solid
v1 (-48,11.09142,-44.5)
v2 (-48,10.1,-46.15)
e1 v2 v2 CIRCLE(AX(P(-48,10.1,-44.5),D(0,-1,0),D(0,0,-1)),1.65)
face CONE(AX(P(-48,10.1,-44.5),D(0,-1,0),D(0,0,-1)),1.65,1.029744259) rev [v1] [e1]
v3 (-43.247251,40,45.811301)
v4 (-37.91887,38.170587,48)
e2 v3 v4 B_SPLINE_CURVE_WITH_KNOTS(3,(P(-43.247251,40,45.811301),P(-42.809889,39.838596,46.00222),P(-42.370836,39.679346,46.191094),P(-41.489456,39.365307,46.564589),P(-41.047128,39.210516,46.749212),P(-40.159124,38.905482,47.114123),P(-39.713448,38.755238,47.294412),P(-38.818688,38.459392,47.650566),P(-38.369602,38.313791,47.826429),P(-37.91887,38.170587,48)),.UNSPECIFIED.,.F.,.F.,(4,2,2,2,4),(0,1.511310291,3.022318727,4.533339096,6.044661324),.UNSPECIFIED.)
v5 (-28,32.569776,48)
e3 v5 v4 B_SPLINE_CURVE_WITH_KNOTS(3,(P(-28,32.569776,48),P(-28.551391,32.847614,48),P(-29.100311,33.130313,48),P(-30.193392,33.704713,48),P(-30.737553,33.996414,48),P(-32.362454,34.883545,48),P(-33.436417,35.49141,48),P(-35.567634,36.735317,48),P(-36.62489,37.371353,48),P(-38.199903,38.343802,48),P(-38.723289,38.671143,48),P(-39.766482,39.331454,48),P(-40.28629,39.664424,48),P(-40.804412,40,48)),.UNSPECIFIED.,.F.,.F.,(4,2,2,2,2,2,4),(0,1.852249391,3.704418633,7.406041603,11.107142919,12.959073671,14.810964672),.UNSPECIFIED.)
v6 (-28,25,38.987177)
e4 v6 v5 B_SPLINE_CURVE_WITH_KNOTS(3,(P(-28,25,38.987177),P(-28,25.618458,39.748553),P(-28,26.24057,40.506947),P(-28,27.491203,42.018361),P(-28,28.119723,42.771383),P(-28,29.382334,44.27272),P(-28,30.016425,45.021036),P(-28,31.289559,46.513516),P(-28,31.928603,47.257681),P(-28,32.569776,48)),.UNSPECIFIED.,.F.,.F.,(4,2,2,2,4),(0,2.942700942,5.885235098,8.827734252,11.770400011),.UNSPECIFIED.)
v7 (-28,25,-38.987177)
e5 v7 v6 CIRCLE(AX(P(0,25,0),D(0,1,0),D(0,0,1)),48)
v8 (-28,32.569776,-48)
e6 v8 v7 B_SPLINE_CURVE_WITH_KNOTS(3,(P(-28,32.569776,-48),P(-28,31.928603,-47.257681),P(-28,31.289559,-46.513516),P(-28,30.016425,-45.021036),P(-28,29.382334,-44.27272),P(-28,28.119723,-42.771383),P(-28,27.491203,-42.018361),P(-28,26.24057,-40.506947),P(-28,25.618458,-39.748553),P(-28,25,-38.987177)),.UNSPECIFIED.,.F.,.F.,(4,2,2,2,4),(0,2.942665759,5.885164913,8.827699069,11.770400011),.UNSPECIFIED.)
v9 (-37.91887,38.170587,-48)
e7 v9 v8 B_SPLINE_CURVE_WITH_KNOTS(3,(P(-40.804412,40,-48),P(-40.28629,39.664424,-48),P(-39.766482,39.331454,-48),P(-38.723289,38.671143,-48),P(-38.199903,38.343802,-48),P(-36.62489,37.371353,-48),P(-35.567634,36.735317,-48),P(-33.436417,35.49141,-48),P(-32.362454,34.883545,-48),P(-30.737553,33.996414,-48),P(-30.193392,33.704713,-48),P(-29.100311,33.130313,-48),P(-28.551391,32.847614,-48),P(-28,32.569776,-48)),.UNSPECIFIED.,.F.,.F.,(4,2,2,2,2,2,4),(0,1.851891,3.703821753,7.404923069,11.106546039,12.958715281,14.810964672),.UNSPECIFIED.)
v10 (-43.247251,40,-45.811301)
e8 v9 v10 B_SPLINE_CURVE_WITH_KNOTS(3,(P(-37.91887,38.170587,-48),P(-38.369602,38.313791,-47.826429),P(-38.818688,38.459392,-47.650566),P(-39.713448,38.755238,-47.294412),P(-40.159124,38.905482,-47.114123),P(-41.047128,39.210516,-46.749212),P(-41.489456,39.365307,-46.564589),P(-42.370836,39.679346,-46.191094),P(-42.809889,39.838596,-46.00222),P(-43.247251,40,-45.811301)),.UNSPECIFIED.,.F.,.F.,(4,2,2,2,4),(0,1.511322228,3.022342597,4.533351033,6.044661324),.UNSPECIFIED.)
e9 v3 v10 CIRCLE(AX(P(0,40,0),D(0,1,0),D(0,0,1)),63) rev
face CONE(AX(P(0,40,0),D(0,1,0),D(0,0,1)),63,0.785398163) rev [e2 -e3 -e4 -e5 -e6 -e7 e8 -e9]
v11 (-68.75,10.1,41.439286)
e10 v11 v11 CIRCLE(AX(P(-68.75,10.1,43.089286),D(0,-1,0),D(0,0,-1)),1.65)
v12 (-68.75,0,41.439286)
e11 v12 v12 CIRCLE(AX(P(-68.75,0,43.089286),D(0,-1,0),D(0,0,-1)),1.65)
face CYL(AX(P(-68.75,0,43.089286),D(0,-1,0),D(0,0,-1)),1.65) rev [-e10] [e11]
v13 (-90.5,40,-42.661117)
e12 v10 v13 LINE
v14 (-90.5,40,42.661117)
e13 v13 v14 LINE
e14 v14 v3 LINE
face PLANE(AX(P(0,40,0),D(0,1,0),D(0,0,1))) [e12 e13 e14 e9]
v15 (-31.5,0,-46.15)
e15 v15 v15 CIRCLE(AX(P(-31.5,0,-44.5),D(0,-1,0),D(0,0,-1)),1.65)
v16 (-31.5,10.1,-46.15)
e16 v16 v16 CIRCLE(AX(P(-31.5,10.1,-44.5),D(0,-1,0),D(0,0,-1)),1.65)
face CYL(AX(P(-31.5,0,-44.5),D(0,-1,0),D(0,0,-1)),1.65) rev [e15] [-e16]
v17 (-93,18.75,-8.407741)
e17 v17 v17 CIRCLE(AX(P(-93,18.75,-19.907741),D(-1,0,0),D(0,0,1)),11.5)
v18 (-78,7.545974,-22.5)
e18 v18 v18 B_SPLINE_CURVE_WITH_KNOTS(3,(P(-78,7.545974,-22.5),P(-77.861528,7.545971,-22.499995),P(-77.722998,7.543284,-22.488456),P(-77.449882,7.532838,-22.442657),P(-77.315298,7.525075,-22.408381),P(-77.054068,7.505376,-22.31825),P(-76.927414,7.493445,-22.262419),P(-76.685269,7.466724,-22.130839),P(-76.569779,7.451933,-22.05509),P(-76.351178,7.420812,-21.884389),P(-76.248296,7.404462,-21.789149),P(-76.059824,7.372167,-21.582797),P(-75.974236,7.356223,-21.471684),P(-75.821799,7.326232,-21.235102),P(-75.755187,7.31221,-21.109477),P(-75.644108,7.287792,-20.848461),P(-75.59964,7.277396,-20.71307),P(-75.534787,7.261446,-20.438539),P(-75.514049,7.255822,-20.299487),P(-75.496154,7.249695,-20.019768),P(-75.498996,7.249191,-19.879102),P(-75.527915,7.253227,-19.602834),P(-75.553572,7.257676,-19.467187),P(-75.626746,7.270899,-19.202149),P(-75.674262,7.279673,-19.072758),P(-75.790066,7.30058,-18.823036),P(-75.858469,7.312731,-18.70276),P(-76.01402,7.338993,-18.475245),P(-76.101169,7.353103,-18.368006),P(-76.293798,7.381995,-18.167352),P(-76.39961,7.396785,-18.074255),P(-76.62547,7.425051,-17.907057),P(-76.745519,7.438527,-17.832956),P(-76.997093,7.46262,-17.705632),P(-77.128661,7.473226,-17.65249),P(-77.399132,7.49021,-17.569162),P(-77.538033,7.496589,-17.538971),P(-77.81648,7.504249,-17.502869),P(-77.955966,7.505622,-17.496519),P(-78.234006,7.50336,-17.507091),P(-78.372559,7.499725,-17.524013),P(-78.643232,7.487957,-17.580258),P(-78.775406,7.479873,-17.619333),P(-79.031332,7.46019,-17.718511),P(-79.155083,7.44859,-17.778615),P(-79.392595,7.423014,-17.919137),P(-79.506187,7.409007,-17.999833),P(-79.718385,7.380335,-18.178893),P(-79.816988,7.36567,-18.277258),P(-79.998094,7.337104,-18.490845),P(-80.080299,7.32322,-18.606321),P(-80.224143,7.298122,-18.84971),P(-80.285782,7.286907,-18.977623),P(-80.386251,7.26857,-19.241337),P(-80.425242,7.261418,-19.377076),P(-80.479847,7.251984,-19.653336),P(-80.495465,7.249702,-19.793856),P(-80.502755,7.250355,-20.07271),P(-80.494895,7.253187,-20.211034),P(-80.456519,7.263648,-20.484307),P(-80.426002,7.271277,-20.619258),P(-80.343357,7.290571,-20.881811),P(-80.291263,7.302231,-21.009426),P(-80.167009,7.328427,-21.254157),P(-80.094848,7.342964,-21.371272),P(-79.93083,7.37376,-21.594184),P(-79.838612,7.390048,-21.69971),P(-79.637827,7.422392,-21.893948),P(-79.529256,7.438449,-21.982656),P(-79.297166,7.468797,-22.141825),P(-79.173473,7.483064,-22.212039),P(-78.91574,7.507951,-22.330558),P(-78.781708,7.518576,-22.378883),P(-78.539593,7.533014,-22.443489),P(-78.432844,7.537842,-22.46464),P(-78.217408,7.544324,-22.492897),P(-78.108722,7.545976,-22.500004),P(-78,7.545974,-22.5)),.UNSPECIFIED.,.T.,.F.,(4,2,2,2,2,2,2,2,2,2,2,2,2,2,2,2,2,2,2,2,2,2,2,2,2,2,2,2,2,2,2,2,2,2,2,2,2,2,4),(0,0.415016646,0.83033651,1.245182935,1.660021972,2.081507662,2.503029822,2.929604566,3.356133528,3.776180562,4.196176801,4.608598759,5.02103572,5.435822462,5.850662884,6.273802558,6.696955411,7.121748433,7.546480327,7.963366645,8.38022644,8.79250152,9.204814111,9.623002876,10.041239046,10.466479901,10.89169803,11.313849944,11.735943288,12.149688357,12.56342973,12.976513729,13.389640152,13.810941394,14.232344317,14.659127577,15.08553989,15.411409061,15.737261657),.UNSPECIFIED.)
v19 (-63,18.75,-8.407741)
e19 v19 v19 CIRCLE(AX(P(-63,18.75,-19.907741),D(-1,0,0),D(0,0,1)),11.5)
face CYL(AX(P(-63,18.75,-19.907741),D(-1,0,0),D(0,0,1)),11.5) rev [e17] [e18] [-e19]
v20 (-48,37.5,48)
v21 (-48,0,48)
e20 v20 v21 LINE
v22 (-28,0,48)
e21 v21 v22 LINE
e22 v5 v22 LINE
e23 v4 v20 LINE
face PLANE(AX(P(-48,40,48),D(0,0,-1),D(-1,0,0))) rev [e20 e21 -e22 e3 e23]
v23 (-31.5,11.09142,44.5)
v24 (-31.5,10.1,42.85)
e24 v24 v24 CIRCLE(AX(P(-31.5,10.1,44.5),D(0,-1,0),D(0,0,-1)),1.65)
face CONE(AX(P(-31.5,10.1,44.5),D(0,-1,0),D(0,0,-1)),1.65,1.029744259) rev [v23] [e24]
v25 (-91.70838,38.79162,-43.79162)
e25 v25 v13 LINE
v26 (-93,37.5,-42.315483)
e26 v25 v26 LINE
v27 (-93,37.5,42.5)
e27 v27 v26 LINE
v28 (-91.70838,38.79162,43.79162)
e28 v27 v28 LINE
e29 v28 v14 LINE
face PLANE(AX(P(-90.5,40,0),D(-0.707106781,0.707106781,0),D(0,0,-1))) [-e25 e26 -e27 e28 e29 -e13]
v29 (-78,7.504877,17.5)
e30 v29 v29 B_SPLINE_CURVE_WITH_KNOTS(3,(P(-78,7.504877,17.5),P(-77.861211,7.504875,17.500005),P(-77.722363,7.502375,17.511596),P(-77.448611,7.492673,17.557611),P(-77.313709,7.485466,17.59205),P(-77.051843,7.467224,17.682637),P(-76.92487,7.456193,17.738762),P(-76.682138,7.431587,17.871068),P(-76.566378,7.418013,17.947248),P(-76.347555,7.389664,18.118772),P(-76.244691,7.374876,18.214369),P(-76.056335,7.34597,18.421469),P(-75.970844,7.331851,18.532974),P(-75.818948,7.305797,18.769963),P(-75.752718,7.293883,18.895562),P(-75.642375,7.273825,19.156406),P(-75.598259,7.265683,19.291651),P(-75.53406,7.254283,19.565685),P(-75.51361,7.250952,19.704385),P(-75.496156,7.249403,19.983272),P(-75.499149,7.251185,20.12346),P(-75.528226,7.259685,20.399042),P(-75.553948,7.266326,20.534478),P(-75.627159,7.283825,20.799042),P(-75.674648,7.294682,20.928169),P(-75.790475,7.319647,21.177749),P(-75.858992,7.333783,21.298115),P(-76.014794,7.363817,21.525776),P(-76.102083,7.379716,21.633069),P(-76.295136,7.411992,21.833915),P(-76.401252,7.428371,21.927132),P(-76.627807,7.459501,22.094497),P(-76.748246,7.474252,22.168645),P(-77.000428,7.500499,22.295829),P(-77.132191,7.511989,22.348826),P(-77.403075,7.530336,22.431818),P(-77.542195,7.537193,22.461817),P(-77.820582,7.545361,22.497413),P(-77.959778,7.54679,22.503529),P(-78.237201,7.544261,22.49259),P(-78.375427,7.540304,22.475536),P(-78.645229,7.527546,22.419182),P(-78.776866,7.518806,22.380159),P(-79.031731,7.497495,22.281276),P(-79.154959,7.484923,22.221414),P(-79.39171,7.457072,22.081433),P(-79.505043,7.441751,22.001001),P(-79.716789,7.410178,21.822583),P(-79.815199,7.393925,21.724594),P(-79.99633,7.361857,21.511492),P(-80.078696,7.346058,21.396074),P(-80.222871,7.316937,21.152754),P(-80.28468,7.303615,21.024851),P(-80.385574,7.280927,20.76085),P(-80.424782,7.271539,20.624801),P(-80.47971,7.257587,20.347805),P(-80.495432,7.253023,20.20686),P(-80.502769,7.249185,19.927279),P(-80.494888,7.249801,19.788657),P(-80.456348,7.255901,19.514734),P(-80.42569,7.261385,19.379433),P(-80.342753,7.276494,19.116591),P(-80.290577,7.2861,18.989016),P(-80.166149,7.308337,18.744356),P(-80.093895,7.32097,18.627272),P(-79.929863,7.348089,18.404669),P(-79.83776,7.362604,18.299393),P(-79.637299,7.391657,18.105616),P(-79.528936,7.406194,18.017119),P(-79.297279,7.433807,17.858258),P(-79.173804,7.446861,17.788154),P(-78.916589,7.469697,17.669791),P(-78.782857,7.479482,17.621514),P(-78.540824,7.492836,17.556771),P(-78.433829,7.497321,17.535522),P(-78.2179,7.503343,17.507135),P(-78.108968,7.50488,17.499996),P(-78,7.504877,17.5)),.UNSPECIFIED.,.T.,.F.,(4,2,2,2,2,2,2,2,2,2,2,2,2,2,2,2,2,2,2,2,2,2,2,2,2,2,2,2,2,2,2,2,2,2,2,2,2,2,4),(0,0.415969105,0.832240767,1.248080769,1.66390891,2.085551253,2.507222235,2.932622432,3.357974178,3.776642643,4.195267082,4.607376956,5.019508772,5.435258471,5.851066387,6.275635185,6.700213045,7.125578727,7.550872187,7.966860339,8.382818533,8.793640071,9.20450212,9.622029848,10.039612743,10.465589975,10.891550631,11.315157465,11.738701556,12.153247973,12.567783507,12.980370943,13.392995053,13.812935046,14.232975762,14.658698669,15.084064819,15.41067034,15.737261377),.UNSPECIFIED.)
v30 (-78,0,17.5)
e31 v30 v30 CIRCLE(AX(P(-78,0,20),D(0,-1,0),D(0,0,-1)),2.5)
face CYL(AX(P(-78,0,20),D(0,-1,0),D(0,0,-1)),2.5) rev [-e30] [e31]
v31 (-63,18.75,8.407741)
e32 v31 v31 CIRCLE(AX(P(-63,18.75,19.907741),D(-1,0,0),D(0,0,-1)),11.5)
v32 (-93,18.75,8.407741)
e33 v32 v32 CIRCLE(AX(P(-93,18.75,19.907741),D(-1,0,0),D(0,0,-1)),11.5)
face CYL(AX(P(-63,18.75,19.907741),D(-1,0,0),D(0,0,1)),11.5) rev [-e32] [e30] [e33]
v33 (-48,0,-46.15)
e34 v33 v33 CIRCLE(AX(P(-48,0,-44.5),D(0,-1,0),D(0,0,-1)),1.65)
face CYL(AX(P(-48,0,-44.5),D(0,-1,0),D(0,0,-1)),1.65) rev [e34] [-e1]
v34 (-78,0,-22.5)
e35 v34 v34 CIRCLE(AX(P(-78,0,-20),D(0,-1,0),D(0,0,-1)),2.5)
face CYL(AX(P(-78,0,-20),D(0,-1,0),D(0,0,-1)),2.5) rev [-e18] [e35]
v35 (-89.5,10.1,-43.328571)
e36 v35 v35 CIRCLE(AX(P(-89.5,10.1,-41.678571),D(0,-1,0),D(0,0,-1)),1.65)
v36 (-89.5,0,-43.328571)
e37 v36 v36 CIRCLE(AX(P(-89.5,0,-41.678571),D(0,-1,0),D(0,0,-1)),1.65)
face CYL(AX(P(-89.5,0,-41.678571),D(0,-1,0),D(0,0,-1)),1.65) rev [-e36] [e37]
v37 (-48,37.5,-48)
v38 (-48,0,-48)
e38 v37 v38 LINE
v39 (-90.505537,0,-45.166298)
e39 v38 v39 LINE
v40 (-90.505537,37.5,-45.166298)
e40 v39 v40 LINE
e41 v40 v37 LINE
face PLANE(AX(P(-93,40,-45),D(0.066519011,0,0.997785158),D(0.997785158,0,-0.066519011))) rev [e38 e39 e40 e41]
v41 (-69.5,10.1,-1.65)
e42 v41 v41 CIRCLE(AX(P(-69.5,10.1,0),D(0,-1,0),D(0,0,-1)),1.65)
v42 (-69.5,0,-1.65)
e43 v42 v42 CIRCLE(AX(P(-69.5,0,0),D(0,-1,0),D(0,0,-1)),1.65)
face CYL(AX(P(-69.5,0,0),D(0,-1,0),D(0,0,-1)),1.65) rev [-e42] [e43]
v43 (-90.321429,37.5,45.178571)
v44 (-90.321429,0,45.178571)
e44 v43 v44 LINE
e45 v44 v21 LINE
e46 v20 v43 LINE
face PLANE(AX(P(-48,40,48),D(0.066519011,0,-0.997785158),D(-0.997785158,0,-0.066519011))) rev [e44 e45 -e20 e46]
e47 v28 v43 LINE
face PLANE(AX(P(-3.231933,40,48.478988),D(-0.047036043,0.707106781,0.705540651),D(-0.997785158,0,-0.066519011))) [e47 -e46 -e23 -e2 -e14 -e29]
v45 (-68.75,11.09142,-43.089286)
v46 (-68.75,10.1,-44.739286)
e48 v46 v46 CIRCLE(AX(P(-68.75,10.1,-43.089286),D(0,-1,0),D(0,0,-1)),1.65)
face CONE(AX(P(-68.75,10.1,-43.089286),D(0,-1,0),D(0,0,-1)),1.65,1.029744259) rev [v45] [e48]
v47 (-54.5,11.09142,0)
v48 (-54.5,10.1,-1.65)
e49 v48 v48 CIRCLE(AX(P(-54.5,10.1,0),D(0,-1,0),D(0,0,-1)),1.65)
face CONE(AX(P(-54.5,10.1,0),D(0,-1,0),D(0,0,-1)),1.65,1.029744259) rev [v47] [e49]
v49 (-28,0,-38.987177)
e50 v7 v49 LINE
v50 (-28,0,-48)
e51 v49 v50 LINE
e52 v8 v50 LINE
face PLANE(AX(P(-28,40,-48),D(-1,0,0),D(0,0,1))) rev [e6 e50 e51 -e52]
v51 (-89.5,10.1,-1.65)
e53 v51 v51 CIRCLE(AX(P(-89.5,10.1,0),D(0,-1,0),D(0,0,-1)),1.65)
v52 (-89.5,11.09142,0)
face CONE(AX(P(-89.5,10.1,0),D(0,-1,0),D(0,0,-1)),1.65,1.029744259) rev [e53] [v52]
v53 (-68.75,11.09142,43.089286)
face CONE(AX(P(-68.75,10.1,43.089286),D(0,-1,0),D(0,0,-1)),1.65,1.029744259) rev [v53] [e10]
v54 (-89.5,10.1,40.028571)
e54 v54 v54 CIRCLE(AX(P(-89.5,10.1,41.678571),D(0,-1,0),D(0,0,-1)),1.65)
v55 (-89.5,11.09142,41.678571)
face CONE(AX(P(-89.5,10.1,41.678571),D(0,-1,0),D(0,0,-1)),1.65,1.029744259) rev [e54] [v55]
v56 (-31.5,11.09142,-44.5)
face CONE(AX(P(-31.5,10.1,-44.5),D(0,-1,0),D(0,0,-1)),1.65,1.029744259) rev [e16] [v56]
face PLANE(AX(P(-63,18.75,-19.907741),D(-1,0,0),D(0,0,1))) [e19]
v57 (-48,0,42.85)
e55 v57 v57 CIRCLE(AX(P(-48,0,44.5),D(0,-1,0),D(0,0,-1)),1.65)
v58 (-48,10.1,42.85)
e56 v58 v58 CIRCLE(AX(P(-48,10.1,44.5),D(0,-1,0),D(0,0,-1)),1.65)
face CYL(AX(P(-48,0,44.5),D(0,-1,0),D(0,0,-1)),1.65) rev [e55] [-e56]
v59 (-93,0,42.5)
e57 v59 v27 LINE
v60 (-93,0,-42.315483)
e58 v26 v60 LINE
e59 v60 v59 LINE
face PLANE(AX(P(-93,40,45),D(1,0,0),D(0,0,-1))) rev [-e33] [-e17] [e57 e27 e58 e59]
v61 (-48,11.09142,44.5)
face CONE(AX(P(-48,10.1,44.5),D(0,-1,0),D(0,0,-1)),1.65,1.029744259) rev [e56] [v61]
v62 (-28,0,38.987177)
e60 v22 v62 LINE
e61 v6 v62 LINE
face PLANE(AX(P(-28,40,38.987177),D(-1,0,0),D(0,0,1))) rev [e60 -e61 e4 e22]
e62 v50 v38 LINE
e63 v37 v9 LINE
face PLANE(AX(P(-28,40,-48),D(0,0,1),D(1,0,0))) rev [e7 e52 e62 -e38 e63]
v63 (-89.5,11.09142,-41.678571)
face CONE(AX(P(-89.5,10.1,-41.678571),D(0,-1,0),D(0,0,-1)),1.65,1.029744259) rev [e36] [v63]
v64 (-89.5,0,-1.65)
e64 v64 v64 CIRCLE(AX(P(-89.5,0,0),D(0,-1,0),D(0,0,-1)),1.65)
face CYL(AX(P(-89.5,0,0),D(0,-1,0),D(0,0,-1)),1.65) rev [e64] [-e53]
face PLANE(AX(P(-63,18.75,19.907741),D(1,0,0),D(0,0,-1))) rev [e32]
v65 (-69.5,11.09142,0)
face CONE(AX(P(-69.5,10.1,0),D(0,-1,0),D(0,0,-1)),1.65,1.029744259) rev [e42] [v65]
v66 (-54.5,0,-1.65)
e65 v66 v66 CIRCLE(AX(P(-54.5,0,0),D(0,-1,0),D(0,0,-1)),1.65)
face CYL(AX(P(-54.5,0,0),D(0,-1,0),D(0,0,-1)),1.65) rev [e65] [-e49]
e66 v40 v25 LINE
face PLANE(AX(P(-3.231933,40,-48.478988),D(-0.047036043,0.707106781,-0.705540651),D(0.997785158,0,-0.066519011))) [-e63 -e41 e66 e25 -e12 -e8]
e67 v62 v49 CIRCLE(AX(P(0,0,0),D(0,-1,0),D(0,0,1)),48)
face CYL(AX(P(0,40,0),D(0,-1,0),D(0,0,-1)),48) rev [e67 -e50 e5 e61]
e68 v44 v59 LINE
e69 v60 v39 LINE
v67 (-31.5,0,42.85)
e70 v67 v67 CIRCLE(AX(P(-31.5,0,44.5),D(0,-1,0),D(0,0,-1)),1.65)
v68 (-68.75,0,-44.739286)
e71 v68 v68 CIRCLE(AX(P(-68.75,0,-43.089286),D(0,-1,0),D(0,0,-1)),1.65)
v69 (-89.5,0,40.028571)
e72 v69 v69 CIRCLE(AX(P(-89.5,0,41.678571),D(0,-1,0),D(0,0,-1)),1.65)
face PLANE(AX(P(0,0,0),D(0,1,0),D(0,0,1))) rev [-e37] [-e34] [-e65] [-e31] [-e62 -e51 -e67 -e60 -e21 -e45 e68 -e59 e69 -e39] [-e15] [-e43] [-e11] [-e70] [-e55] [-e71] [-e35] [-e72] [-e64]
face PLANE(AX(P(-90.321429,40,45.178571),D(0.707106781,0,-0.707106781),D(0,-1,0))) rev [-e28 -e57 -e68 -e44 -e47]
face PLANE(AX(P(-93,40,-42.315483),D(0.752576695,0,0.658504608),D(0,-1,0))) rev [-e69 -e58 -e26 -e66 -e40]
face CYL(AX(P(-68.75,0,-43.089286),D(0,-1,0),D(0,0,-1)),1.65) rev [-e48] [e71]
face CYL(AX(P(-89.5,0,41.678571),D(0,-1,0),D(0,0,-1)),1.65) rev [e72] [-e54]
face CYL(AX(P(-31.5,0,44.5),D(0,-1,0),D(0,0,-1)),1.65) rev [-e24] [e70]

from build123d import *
from OCP.BRepFilletAPI import BRepFilletAPI_MakeChamfer

# Parameters (mm, degrees)
BOSS_EXTRUDE2_DEPTH       = 40
CHAMFER1_SIZE             = 15
CHAMFER3_SIZE             = 2.5
CHAMFER3_SIZE2            = 2.68451721
M4X0_7_TAPPED_HOLE1_D     = 3.3
M4X0_7_TAPPED_HOLE1_DEPTH = 10.1
M4X0_7_TAPPED_HOLE1_TIP   = 0.991420021
SKETCH4_R                 = 11.5
CUT_EXTRUDE1_DEPTH        = 30
M6X1_0_TAPPED_HOLE1_D     = 5
M6X1_0_TAPPED_HOLE1_DEPTH = 15
M6X1_0_TAPPED_HOLE1_TIP   = 1.502151548


with BuildPart() as part:
    # Sketch1 → Boss-Extrude2 (new body)
    with BuildSketch(Plane(origin=(0, 0, 0), x_dir=(1, 0, 0), z_dir=(0, 1, 0))):
        with BuildLine():
            Line((-28, 48), (-48, 48))
            Line((-48, 48), (-93, 45))
            Line((-93, 45), (-93, -45))
            Line((-93, -45), (-48, -48))
            Line((-48, -48), (-28, -48))
            Line((-28, -48), (-28, -38.987177379))
            ThreePointArc((-28, -38.987177379), (-48, 0), (-28, 38.987177379))
            Line((-28, 38.987177379), (-28, 48))
        make_face()
    extrude(amount=BOSS_EXTRUDE2_DEPTH)

    # Chamfer1
    chamfer1_edges = [part.edges().sort_by_distance(p)[0] for p in [
        (-48, 40, 0),
    ]]
    chamfer(chamfer1_edges, length=CHAMFER1_SIZE)

    # Chamfer2
    # the kernel refuses this chamfer: 2.5 mm, written as the material it takes off along each edge
    with BuildSketch(Plane(origin=(-32.604077303, 40, -49.026394846), x_dir=(0.06649386081081782, 0.027495876610587725, 0.9974079121622642), z_dir=(-0.997785157856609, 0, 0.06651901052377412)), Plane(origin=(-108.395922697, 40, 43.973605154), x_dir=(0.06649386081081746, 0.02749587661058773, -0.9974079121622642), z_dir=(0.997785157856609, 0, 0.06651901052377378))) as chamfer2_piece_1:
        with BuildLine():
            Line((2.571682988, 0), (-0.141367887, -2.567794484))
            Line((-0.141367887, -2.567794484), (-0.191348983, -2.56641969))
            ThreePointArc((-0.191348983, -2.56641969), (-0.085323068, -1.283494574), (-0.049981096, 0.001374794))
            Line((-0.049981096, 0.001374794), (0.001374794, 0.049981096))
            ThreePointArc((0.001374794, 0.049981096), (1.286244162, 0.014639124), (2.573057782, 0.049981096))
            Line((2.573057782, 0.049981096), (2.571682988, 0))
        make_face()
    extrude(amount=75.960084991, mode=Mode.SUBTRACT)
    with BuildSketch(Plane(origin=(-93, 40, -60.430097928), x_dir=(0.9996219169112968, 0.027495876610587663, 0), z_dir=(0, 0, 1))) as chamfer2_piece_2:
        with BuildLine():
            Line((2.571682988, 0), (-0.141367887, -2.567794484))
            Line((-0.141367887, -2.567794484), (-0.191348983, -2.56641969))
            ThreePointArc((-0.191348983, -2.56641969), (-0.085323068, -1.283494574), (-0.049981096, 0.001374794))
            Line((-0.049981096, 0.001374794), (0.001374794, 0.049981096))
            ThreePointArc((0.001374794, 0.049981096), (1.286244162, 0.014639124), (2.573057782, 0.049981096))
            Line((2.573057782, 0.049981096), (2.571682988, 0))
        make_face()
    extrude(amount=120.860195856, mode=Mode.SUBTRACT)

    # Chamfer3: one chamfer whose edges measure the first distance from different faces: ONE call of the kernel's chamfer builder (chamfer() names one face for all edges)
    chamfer3_edges_1 = [part.edges().sort_by_distance(p)[0] for p in [
        (-93, 18.75, -45),
    ]]
    chamfer3_side_1 = [part.faces().sort_by_distance(p)[0] for p in [
        (-70.5, 18.75, -46.5),
    ]]
    chamfer3_edges_2 = [part.edges().sort_by_distance(p)[0] for p in [
        (-93, 18.75, 45),
    ]]
    chamfer3_side_2 = [part.faces().sort_by_distance(p)[0] for p in [
        (-93, 18.75, 0),
    ]]
    chamfer3 = BRepFilletAPI_MakeChamfer(part.part.solid().wrapped)
    for e in chamfer3_edges_1:
        chamfer3.Add(CHAMFER3_SIZE, CHAMFER3_SIZE2, e.wrapped, chamfer3_side_1[0].wrapped)  # the first distance lies on this face
    for e in chamfer3_edges_2:
        chamfer3.Add(CHAMFER3_SIZE, CHAMFER3_SIZE2, e.wrapped, chamfer3_side_2[0].wrapped)  # the first distance lies on this face
    add(Compound.cast(chamfer3.Shape()), mode=Mode.REPLACE)

    # M4x0.7 Tapped Hole1
    with Locations(Plane(origin=(-89.5, 0, 41.678571429), x_dir=(0, 0, -1), z_dir=(0, -1, 0))):
        with Locations((0, 0), (-1.410714285, 20.75), (-2.821428571, 41.5), (-2.821428571, 58), (83.357142858, 0), (84.767857143, 20.75), (86.178571429, 41.5), (86.178571429, 58), (41.678571429, 0), (41.678571429, 20), (41.678571429, 35)):
            Hole(M4X0_7_TAPPED_HOLE1_D / 2, depth=M4X0_7_TAPPED_HOLE1_DEPTH)
            with Locations((0, 0, -(M4X0_7_TAPPED_HOLE1_DEPTH + M4X0_7_TAPPED_HOLE1_TIP / 2))):  # 118° drill point
                Cone(0, M4X0_7_TAPPED_HOLE1_D / 2, M4X0_7_TAPPED_HOLE1_TIP, mode=Mode.SUBTRACT)

    # Sketch4 → Cut-Extrude1 (cut)
    with BuildSketch(Plane.ZY.offset(93)):
        with Locations((-19.907741395, 18.75)):
            Circle(SKETCH4_R)
        with Locations(Location((19.907741395, 18.75, 0), (0, 0, 180))):
            Circle(SKETCH4_R)
    extrude(amount=-CUT_EXTRUDE1_DEPTH, mode=Mode.SUBTRACT)

    # M6x1.0 Tapped Hole1
    with Locations(Plane(origin=(-78, 0, 20), x_dir=(0, 0, -1), z_dir=(0, -1, 0))):
        with Locations((0, 0), (40, 0)):
            Hole(M6X1_0_TAPPED_HOLE1_D / 2, depth=M6X1_0_TAPPED_HOLE1_DEPTH)
            with Locations((0, 0, -(M6X1_0_TAPPED_HOLE1_DEPTH + M6X1_0_TAPPED_HOLE1_TIP / 2))):  # 118° drill point
                Cone(0, M6X1_0_TAPPED_HOLE1_D / 2, M6X1_0_TAPPED_HOLE1_TIP, mode=Mode.SUBTRACT)


solid = part.part
